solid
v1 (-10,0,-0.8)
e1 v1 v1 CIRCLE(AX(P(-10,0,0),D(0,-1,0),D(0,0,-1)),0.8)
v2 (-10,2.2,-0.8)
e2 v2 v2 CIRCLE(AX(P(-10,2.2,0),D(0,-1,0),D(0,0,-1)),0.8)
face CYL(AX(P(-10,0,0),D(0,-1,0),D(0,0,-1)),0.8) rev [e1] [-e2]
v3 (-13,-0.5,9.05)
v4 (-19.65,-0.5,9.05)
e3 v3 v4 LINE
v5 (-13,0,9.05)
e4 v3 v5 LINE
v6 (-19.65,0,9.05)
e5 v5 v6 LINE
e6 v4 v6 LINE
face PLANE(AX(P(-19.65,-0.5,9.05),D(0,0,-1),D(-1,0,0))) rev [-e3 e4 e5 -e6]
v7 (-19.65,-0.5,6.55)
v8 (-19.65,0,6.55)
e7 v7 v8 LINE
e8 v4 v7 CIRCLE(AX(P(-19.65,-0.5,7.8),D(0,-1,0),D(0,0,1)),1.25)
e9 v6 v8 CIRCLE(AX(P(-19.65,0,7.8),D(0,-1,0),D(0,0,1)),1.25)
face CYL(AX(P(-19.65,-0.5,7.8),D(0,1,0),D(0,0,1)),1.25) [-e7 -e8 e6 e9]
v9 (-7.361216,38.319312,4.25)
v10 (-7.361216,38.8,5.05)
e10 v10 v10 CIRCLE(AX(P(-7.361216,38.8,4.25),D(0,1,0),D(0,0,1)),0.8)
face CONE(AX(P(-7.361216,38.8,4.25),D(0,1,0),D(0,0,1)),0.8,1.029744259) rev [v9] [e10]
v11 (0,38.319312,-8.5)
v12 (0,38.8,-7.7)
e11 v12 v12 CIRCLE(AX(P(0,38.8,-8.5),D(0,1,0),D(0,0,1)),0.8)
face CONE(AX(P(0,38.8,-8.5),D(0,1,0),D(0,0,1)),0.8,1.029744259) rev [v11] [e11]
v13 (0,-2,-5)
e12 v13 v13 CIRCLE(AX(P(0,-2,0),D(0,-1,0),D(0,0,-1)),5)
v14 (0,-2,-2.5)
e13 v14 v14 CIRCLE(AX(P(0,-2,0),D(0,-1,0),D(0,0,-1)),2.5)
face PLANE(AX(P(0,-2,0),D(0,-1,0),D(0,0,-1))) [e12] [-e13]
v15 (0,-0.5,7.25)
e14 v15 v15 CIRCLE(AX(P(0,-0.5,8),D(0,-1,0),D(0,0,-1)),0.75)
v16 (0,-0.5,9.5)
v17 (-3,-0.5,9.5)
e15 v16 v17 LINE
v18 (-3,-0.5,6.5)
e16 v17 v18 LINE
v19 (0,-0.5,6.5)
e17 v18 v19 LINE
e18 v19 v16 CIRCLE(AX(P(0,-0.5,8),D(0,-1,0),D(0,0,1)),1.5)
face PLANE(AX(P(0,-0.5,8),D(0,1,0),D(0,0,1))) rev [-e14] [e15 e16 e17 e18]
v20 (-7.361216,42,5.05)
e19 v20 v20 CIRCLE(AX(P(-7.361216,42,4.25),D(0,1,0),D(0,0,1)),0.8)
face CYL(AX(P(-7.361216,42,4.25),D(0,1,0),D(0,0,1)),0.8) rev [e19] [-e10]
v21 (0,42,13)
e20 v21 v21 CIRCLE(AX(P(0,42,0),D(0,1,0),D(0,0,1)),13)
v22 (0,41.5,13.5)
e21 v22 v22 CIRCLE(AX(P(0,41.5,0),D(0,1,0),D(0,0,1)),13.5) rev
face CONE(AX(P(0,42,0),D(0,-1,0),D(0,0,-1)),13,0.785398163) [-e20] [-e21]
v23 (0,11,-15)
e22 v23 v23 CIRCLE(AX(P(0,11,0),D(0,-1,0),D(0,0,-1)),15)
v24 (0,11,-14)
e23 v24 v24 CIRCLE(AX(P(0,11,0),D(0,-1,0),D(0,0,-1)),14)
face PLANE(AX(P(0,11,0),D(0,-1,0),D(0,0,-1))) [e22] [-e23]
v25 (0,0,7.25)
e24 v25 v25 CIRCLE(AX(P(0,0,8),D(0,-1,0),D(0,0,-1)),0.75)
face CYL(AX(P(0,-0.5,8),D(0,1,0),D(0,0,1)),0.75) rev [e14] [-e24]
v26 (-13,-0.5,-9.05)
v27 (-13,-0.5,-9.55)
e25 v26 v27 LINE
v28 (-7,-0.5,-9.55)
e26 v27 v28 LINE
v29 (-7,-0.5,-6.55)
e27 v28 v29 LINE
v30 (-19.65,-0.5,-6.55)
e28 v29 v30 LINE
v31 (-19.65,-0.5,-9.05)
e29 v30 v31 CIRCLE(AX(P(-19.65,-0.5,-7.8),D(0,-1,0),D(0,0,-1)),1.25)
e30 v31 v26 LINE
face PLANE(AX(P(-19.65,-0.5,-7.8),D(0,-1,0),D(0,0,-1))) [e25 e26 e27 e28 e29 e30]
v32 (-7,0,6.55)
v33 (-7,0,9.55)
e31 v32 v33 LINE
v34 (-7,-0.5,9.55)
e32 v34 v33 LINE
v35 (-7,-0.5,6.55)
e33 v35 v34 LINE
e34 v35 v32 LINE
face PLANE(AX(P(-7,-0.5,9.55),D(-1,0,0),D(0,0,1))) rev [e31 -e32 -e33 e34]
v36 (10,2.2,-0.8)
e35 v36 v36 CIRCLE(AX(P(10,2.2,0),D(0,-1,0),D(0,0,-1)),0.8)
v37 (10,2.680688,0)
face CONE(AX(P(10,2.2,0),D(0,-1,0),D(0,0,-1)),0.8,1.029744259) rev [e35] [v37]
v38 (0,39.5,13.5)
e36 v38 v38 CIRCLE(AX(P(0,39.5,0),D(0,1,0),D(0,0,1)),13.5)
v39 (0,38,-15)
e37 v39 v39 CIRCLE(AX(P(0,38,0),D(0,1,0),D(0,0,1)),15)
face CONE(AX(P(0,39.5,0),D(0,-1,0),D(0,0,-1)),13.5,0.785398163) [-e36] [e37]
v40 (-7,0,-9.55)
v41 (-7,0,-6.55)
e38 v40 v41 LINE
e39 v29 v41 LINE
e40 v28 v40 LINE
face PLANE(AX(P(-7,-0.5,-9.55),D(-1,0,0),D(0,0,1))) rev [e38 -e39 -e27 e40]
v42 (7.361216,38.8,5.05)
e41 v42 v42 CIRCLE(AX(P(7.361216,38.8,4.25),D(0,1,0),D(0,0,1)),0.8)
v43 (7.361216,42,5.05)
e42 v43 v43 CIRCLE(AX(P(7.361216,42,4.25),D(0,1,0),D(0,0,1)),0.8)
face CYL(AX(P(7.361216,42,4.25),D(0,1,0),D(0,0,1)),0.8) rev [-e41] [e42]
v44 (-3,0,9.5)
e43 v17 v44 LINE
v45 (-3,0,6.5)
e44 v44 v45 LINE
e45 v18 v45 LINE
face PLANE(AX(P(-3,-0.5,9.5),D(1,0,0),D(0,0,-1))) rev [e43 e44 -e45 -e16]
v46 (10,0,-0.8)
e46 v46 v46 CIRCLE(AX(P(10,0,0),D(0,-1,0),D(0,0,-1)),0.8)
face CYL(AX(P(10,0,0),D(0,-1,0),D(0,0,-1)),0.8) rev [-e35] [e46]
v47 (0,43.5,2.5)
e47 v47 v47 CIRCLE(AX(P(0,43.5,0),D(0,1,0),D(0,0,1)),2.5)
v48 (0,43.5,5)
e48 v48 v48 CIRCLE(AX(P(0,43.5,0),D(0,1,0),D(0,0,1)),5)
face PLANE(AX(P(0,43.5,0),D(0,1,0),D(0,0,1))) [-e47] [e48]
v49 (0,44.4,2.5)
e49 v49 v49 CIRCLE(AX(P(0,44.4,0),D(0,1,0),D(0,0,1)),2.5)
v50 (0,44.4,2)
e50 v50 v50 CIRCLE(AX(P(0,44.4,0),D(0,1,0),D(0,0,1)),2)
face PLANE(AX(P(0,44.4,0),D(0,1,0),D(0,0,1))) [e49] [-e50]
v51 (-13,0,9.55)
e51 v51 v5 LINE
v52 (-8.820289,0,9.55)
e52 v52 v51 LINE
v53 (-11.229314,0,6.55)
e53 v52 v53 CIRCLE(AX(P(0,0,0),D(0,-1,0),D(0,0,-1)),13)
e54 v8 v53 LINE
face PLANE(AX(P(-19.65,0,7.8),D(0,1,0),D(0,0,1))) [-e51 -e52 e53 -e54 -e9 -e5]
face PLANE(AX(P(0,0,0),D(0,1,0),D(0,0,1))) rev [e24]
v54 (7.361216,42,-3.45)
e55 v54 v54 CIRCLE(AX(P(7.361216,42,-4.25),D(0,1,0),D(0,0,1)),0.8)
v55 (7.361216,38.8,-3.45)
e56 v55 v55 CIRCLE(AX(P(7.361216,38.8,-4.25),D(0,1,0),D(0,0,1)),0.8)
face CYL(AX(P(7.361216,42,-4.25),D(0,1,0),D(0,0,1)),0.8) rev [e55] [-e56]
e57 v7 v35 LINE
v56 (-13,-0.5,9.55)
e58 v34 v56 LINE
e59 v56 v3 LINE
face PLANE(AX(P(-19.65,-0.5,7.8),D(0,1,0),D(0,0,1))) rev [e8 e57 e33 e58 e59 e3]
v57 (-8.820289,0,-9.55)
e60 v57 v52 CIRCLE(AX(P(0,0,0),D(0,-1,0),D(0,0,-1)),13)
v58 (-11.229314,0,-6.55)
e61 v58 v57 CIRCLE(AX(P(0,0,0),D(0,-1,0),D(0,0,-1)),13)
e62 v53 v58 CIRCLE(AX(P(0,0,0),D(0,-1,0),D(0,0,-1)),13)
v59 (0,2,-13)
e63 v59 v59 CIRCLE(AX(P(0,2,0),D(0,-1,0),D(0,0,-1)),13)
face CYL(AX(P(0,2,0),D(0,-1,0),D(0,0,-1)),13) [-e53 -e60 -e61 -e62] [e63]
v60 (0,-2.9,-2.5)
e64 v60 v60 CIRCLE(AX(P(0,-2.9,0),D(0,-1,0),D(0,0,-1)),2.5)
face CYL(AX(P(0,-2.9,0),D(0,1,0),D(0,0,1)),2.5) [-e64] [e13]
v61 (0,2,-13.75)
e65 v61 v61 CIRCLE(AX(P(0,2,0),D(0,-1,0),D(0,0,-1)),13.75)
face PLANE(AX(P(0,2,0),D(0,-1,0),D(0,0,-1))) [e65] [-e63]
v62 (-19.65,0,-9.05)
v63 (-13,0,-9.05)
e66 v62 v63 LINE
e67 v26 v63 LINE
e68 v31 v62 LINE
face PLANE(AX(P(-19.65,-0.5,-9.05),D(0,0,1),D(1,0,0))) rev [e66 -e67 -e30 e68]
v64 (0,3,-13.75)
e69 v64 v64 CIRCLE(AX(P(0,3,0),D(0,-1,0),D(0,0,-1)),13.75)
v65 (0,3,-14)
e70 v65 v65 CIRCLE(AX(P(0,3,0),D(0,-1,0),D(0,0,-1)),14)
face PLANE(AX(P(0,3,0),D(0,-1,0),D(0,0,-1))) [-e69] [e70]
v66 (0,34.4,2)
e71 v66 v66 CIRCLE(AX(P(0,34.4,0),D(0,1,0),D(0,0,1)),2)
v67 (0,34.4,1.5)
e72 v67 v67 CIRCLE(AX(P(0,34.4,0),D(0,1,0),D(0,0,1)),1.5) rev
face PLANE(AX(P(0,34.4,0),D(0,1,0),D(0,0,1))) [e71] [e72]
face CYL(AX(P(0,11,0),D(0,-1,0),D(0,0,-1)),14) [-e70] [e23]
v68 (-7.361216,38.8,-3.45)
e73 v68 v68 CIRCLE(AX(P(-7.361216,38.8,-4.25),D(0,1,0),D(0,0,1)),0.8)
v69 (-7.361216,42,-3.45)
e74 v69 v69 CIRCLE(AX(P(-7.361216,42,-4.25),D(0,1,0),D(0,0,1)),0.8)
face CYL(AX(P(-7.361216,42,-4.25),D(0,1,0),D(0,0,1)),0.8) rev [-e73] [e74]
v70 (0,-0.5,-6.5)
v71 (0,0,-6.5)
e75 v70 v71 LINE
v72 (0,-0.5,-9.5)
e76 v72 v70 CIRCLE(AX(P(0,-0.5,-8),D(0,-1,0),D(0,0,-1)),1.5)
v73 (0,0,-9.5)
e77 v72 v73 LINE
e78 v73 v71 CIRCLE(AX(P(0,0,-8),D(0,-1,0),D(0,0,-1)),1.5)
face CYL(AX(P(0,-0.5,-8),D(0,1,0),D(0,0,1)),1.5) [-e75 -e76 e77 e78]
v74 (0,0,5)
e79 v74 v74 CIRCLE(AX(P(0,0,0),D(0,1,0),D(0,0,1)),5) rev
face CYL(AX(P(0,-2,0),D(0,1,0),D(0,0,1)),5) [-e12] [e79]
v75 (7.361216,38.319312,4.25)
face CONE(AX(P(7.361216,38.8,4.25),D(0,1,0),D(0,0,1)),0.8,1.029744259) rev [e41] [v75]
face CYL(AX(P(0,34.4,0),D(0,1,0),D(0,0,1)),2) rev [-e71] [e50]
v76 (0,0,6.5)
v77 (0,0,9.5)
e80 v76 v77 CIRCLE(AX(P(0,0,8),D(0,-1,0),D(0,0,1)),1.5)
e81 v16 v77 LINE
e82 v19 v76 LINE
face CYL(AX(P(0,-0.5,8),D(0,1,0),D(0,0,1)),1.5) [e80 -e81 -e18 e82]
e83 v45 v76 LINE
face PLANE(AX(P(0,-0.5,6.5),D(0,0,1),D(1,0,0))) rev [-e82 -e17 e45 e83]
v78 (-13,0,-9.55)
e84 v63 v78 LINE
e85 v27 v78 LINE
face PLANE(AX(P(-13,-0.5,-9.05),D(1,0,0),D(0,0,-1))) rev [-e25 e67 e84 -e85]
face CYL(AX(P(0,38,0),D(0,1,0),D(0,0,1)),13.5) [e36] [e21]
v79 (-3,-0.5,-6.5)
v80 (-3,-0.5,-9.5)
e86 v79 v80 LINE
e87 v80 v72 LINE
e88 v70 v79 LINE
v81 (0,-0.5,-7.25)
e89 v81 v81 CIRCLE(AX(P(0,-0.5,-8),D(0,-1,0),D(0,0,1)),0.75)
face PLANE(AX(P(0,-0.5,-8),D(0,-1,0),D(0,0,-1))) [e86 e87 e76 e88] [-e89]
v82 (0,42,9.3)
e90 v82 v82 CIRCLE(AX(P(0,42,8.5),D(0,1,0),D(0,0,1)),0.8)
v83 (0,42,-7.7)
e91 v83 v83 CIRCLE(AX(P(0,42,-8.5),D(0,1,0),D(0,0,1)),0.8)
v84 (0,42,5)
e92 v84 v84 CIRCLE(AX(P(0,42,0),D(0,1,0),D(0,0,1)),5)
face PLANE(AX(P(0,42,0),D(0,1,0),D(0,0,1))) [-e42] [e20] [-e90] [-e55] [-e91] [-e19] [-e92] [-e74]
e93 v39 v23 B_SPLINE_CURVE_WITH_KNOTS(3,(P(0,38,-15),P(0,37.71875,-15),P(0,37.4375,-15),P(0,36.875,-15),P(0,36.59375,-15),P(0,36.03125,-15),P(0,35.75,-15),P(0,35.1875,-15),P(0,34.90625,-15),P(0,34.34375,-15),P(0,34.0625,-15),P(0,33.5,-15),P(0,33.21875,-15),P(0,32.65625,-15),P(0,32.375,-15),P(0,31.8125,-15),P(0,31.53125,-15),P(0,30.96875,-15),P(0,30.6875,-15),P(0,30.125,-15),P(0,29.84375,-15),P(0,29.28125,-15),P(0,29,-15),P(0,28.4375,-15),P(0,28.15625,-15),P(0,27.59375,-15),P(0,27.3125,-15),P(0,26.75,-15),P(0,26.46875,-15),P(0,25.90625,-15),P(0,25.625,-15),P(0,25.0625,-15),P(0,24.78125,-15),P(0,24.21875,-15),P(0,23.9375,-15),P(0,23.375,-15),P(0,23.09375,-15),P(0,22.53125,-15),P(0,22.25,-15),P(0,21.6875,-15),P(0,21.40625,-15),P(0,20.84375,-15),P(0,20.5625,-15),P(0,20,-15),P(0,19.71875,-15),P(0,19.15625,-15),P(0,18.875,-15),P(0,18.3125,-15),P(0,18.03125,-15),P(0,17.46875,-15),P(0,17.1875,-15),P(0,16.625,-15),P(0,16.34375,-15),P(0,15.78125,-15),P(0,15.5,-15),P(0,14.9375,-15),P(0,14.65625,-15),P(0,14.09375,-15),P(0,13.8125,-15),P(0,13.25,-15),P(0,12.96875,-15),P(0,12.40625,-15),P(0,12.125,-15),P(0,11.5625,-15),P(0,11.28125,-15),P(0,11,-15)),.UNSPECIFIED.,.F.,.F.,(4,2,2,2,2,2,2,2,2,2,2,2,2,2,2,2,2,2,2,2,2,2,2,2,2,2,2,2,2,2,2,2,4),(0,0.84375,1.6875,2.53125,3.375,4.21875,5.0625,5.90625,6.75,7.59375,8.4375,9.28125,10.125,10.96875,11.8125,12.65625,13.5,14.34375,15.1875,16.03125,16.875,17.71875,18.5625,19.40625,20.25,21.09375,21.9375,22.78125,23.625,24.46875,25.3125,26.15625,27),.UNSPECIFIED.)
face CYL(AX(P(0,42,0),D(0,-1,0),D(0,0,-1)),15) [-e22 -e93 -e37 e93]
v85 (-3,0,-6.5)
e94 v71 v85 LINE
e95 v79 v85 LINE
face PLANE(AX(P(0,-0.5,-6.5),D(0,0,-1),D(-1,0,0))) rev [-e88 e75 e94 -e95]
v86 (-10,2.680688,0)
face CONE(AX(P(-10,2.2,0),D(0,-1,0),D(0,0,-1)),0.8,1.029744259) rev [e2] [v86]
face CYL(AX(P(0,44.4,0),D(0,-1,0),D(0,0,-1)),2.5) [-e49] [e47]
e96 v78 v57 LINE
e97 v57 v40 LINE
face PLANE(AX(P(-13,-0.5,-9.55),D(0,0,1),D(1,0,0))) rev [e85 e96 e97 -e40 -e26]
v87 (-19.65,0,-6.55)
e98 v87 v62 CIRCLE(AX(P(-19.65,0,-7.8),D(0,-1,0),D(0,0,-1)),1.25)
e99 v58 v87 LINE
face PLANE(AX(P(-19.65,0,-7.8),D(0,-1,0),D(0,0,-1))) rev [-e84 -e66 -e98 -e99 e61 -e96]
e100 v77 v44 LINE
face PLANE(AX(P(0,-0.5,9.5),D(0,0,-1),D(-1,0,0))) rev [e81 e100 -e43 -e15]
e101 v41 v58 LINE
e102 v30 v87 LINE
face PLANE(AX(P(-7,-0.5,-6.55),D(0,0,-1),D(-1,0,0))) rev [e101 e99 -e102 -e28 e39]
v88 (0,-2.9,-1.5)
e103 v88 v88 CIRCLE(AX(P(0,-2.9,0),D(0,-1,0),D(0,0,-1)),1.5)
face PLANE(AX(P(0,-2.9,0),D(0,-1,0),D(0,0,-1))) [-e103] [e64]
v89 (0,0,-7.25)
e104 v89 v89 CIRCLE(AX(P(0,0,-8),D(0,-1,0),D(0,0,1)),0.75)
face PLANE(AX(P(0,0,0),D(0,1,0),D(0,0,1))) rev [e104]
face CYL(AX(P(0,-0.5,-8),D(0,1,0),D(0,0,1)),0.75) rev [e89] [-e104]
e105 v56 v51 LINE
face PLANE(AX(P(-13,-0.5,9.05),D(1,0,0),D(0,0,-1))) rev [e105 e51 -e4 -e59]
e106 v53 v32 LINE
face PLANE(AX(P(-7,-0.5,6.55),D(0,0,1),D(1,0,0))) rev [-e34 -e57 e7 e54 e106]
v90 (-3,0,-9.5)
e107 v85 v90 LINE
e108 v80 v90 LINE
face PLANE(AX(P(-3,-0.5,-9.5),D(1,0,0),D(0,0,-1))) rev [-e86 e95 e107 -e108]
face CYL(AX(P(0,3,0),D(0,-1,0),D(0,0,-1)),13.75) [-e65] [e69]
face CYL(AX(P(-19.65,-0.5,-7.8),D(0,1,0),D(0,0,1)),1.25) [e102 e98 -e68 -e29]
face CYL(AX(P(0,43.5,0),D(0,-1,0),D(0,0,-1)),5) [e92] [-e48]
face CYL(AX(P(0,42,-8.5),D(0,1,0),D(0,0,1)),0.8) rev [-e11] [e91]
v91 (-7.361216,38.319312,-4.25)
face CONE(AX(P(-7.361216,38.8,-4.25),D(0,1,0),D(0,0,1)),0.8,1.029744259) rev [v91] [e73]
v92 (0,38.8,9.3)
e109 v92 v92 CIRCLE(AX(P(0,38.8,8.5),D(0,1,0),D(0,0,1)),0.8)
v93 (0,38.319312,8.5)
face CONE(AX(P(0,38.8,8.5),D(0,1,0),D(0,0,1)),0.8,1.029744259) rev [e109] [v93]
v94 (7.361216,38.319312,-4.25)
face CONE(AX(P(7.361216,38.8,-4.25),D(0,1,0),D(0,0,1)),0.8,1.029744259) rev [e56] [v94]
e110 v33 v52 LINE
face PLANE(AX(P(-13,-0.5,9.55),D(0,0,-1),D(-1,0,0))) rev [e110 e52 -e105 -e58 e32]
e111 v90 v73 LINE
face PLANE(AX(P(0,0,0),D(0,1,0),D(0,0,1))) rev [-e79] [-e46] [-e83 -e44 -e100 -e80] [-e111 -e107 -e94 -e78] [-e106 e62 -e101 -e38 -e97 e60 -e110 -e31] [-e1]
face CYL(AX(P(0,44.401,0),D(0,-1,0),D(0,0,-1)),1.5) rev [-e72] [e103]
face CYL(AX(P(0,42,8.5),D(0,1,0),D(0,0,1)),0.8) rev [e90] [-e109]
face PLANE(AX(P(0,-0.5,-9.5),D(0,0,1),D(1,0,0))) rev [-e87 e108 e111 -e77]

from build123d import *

# Parameters (mm, degrees)
ESQUISSE1_R             = 15
EXTRUSION1_DEPTH        = 42
ESQUISSE2_OUTSIDE_W     = 43.94
ESQUISSE2_OUTSIDE_H     = 43.94
ESQUISSE2_OUTSIDE_R     = 13.5
ENL_V_MAT_EXTRU_1_DEPTH = 4
ESQUISSE3_OUTSIDE_W     = 43.94
ESQUISSE3_OUTSIDE_H     = 43.94
ESQUISSE3_OUTSIDE_R     = 13
ENL_V_MAT_EXTRU_2_DEPTH = 2
ESQUISSE4_OUTSIDE_W     = 43.94
ESQUISSE4_OUTSIDE_H     = 43.94
ESQUISSE4_OUTSIDE_R     = 13.75
ENL_V_MAT_EXTRU_3_DEPTH = 1
ESQUISSE5_OUTSIDE_W     = 43.94
ESQUISSE5_OUTSIDE_H     = 43.94
ESQUISSE5_OUTSIDE_R     = 14
ENL_V_MAT_EXTRU_4_DEPTH = 8
CHANFREIN1_SIZE         = 0.5
CHANFREIN2_SIZE         = 1.5
ESQUISSE6_R             = 5
EXTRUSION2_DEPTH        = 1.5
EXTRUSION3_START        = 2
ESQUISSE7_R             = 5
EXTRUSION3_DEPTH        = 2
ESQUISSE8_R             = 2.5
EXTRUSION4_DEPTH        = 0.9
EXTRUSION5_START        = 0.9
ESQUISSE9_R             = 2.5
EXTRUSION5_DEPTH        = 0.9
ENL_V_MAT_EXTRU_5_REACH = 53.839
ESQUISSE10_R            = 1.5
ESQUISSE11_R            = 2
ENL_V_MAT_EXTRU_6_DEPTH = 10
TROU_TARAUD_M21_D       = 1.6
TROU_TARAUD_M21_DEPTH   = 3.2
TROU_TARAUD_M21_TIP     = 0.480688495
TROU_TARAUD_M22_D       = 1.6
TROU_TARAUD_M22_DEPTH   = 2.2
TROU_TARAUD_M22_TIP     = 0.480688495
ESQUISSE16_R            = 0.75
EXTRUSION6_DEPTH        = 0.5


with BuildPart() as part:
    # Esquisse1 → Extrusion1 (new body)
    with BuildSketch(Plane(origin=(0, 0, 0), x_dir=(1, 0, 0), z_dir=(0, 1, 0))):
        with Locations(Location((0, 0, 0), (0, 0, 90))):
            Circle(ESQUISSE1_R)
    extrude(amount=EXTRUSION1_DEPTH)

    # Esquisse2 outside → Enlèv. mat.-Extru.1 (cut)
    with BuildSketch(Plane(origin=(0, 42, 0), x_dir=(1, 0, 0), z_dir=(0, 1, 0))):
        Rectangle(ESQUISSE2_OUTSIDE_W, ESQUISSE2_OUTSIDE_H)
        with Locations(Location((0, 0, 0), (0, 0, 270))):
            Circle(ESQUISSE2_OUTSIDE_R, mode=Mode.SUBTRACT)
    extrude(amount=-ENL_V_MAT_EXTRU_1_DEPTH, mode=Mode.SUBTRACT)

    # Esquisse3 outside → Enlèv. mat.-Extru.2 (cut)
    with BuildSketch(Plane.XZ):
        Rectangle(ESQUISSE3_OUTSIDE_W, ESQUISSE3_OUTSIDE_H)
        with Locations(Location((0, 0, 0), (0, 0, 270))):
            Circle(ESQUISSE3_OUTSIDE_R, mode=Mode.SUBTRACT)
    extrude(amount=-ENL_V_MAT_EXTRU_2_DEPTH, mode=Mode.SUBTRACT)

    # Esquisse4 outside → Enlèv. mat.-Extru.3 (cut)
    with BuildSketch(Plane.XZ.offset(-2)):
        Rectangle(ESQUISSE4_OUTSIDE_W, ESQUISSE4_OUTSIDE_H)
        with Locations(Location((0, 0, 0), (0, 0, 270))):
            Circle(ESQUISSE4_OUTSIDE_R, mode=Mode.SUBTRACT)
    extrude(amount=-ENL_V_MAT_EXTRU_3_DEPTH, mode=Mode.SUBTRACT)

    # Esquisse5 outside → Enlèv. mat.-Extru.4 (cut)
    with BuildSketch(Plane.XZ.offset(-3)):
        Rectangle(ESQUISSE5_OUTSIDE_W, ESQUISSE5_OUTSIDE_H)
        with Locations(Location((0, 0, 0), (0, 0, 270))):
            Circle(ESQUISSE5_OUTSIDE_R, mode=Mode.SUBTRACT)
    extrude(amount=-ENL_V_MAT_EXTRU_4_DEPTH, mode=Mode.SUBTRACT)

    # Chanfrein1
    chanfrein1_edges = [part.edges().sort_by_distance(p)[0] for p in [
        (0, 42, -13.5),
    ]]
    chamfer(chanfrein1_edges, length=CHANFREIN1_SIZE)

    # Chanfrein2
    chanfrein2_edges = [part.edges().sort_by_distance(p)[0] for p in [
        (0, 38, -13.5),
    ]]
    chamfer(chanfrein2_edges, length=CHANFREIN2_SIZE - 0.0001)  # a hair under: the kernel refuses the full size

    # Esquisse6 → Extrusion2 (add)
    with BuildSketch(Plane(origin=(0, 42, 0), x_dir=(1, 0, 0), z_dir=(0, 1, 0))):
        with Locations(Location((0, 0, 0), (0, 0, 270))):
            Circle(ESQUISSE6_R)
    extrude(amount=EXTRUSION2_DEPTH)

    # Esquisse7 → Extrusion3 (add)
    with BuildSketch(Plane.XZ.offset(EXTRUSION3_START)):
        with Locations(Location((0, 0, 0), (0, 0, 90))):
            Circle(ESQUISSE7_R)
    extrude(amount=-EXTRUSION3_DEPTH)

    # Esquisse8 → Extrusion4 (add)
    with BuildSketch(Plane(origin=(0, 43.5, 0), x_dir=(1, 0, 0), z_dir=(0, 1, 0))):
        with Locations(Location((0, 0, 0), (0, 0, 270))):
            Circle(ESQUISSE8_R)
    extrude(amount=EXTRUSION4_DEPTH)

    # Esquisse9 → Extrusion5 (add)
    with BuildSketch(Plane.XZ.offset(2).offset(EXTRUSION5_START)):
        with Locations(Location((0, 0, 0), (0, 0, 90))):
            Circle(ESQUISSE9_R)
    extrude(amount=-EXTRUSION5_DEPTH)

    # Esquisse10 → Enlèv. mat.-Extru.5 (cut, up to next)
    with BuildSketch(Plane.XZ.offset(2.9), mode=Mode.PRIVATE) as enl_v_mat_extru_5_sk1:
        with Locations(Location((0, 0, 0), (0, 0, 270))):
            Circle(ESQUISSE10_R)
    enl_v_mat_extru_5_tool1 = extrude(enl_v_mat_extru_5_sk1.sketch, amount=-ENL_V_MAT_EXTRU_5_REACH, mode=Mode.PRIVATE) & part.part
    add(enl_v_mat_extru_5_tool1.solids().sort_by_distance((0, -2.9, 0))[0], mode=Mode.SUBTRACT)

    # Esquisse11 → Enlèv. mat.-Extru.6 (cut)
    with BuildSketch(Plane(origin=(0, 44.4, 0), x_dir=(1, 0, 0), z_dir=(0, 1, 0))):
        with Locations(Location((0, 0, 0), (0, 0, 270))):
            Circle(ESQUISSE11_R)
    extrude(amount=-ENL_V_MAT_EXTRU_6_DEPTH, mode=Mode.SUBTRACT)

    # Trou taraudé M21
    with Locations(Plane(origin=(0, 42, 0), x_dir=(-1, 0, 0), z_dir=(0, 1, 0))):
        with Locations((0, 8.5), (-7.361215932, 4.25), (-7.361215932, -4.25), (0, -8.5), (7.361215932, -4.25), (7.361215932, 4.25)):
            Hole(TROU_TARAUD_M21_D / 2, depth=TROU_TARAUD_M21_DEPTH)
            with Locations((0, 0, -(TROU_TARAUD_M21_DEPTH + TROU_TARAUD_M21_TIP / 2))):  # 118° drill point
                Cone(0, TROU_TARAUD_M21_D / 2, TROU_TARAUD_M21_TIP, mode=Mode.SUBTRACT)

    # Trou taraudé M22
    with Locations(Plane.XZ):
        with Locations((10, 0), (-10, 0)):
            Hole(TROU_TARAUD_M22_D / 2, depth=TROU_TARAUD_M22_DEPTH)
            with Locations((0, 0, -(TROU_TARAUD_M22_DEPTH + TROU_TARAUD_M22_TIP / 2))):  # 118° drill point
                Cone(0, TROU_TARAUD_M22_D / 2, TROU_TARAUD_M22_TIP, mode=Mode.SUBTRACT)

    # Esquisse16 → Extrusion6 (add)
    # profile 1 of 4: a face of its own
    with BuildSketch(Plane.XZ):
        with BuildLine():
            Line((0, 9.5), (-3, 9.5))
            Line((-3, 9.5), (-3, 6.5))
            Line((-3, 6.5), (0, 6.5))
            ThreePointArc((0, 6.5), (1.5, 8), (0, 9.5))
        make_face()
        with Locations(Location((0, 8, 0), (0, 0, 270))):
            Circle(ESQUISSE16_R, mode=Mode.SUBTRACT)
    # profile 2 of 4: a face of its own
    with BuildSketch(Plane.XZ):
        with BuildLine():
            Line((-7, 9.55), (-7, 6.55))
            Line((-7, 6.55), (-19.65, 6.55))
            ThreePointArc((-19.65, 6.55), (-20.9, 7.8), (-19.65, 9.05))
            Line((-19.65, 9.05), (-13, 9.05))
            Line((-13, 9.05), (-13, 9.55))
            Line((-13, 9.55), (-7, 9.55))
        make_face()
    # profile 3 of 4: a face of its own
    with BuildSketch(Plane.XZ):
        with BuildLine():
            Line((-13, -9.55), (-7, -9.55))
            Line((-7, -9.55), (-7, -6.55))
            Line((-7, -6.55), (-19.65, -6.55))
            ThreePointArc((-19.65, -6.55), (-20.9, -7.8), (-19.65, -9.05))
            Line((-19.65, -9.05), (-13, -9.05))
            Line((-13, -9.05), (-13, -9.55))
        make_face()
    # profile 4 of 4: a face of its own
    with BuildSketch(Plane.XZ):
        with BuildLine():
            Line((-3, -9.5), (-3, -6.5))
            Line((-3, -6.5), (0, -6.5))
            ThreePointArc((0, -6.5), (1.5, -8), (0, -9.5))
            Line((0, -9.5), (-3, -9.5))
        make_face()
        with Locations(Location((0, -8, 0), (0, 0, 90))):
            Circle(ESQUISSE16_R, mode=Mode.SUBTRACT)
    extrude(amount=EXTRUSION6_DEPTH)


solid = part.part
